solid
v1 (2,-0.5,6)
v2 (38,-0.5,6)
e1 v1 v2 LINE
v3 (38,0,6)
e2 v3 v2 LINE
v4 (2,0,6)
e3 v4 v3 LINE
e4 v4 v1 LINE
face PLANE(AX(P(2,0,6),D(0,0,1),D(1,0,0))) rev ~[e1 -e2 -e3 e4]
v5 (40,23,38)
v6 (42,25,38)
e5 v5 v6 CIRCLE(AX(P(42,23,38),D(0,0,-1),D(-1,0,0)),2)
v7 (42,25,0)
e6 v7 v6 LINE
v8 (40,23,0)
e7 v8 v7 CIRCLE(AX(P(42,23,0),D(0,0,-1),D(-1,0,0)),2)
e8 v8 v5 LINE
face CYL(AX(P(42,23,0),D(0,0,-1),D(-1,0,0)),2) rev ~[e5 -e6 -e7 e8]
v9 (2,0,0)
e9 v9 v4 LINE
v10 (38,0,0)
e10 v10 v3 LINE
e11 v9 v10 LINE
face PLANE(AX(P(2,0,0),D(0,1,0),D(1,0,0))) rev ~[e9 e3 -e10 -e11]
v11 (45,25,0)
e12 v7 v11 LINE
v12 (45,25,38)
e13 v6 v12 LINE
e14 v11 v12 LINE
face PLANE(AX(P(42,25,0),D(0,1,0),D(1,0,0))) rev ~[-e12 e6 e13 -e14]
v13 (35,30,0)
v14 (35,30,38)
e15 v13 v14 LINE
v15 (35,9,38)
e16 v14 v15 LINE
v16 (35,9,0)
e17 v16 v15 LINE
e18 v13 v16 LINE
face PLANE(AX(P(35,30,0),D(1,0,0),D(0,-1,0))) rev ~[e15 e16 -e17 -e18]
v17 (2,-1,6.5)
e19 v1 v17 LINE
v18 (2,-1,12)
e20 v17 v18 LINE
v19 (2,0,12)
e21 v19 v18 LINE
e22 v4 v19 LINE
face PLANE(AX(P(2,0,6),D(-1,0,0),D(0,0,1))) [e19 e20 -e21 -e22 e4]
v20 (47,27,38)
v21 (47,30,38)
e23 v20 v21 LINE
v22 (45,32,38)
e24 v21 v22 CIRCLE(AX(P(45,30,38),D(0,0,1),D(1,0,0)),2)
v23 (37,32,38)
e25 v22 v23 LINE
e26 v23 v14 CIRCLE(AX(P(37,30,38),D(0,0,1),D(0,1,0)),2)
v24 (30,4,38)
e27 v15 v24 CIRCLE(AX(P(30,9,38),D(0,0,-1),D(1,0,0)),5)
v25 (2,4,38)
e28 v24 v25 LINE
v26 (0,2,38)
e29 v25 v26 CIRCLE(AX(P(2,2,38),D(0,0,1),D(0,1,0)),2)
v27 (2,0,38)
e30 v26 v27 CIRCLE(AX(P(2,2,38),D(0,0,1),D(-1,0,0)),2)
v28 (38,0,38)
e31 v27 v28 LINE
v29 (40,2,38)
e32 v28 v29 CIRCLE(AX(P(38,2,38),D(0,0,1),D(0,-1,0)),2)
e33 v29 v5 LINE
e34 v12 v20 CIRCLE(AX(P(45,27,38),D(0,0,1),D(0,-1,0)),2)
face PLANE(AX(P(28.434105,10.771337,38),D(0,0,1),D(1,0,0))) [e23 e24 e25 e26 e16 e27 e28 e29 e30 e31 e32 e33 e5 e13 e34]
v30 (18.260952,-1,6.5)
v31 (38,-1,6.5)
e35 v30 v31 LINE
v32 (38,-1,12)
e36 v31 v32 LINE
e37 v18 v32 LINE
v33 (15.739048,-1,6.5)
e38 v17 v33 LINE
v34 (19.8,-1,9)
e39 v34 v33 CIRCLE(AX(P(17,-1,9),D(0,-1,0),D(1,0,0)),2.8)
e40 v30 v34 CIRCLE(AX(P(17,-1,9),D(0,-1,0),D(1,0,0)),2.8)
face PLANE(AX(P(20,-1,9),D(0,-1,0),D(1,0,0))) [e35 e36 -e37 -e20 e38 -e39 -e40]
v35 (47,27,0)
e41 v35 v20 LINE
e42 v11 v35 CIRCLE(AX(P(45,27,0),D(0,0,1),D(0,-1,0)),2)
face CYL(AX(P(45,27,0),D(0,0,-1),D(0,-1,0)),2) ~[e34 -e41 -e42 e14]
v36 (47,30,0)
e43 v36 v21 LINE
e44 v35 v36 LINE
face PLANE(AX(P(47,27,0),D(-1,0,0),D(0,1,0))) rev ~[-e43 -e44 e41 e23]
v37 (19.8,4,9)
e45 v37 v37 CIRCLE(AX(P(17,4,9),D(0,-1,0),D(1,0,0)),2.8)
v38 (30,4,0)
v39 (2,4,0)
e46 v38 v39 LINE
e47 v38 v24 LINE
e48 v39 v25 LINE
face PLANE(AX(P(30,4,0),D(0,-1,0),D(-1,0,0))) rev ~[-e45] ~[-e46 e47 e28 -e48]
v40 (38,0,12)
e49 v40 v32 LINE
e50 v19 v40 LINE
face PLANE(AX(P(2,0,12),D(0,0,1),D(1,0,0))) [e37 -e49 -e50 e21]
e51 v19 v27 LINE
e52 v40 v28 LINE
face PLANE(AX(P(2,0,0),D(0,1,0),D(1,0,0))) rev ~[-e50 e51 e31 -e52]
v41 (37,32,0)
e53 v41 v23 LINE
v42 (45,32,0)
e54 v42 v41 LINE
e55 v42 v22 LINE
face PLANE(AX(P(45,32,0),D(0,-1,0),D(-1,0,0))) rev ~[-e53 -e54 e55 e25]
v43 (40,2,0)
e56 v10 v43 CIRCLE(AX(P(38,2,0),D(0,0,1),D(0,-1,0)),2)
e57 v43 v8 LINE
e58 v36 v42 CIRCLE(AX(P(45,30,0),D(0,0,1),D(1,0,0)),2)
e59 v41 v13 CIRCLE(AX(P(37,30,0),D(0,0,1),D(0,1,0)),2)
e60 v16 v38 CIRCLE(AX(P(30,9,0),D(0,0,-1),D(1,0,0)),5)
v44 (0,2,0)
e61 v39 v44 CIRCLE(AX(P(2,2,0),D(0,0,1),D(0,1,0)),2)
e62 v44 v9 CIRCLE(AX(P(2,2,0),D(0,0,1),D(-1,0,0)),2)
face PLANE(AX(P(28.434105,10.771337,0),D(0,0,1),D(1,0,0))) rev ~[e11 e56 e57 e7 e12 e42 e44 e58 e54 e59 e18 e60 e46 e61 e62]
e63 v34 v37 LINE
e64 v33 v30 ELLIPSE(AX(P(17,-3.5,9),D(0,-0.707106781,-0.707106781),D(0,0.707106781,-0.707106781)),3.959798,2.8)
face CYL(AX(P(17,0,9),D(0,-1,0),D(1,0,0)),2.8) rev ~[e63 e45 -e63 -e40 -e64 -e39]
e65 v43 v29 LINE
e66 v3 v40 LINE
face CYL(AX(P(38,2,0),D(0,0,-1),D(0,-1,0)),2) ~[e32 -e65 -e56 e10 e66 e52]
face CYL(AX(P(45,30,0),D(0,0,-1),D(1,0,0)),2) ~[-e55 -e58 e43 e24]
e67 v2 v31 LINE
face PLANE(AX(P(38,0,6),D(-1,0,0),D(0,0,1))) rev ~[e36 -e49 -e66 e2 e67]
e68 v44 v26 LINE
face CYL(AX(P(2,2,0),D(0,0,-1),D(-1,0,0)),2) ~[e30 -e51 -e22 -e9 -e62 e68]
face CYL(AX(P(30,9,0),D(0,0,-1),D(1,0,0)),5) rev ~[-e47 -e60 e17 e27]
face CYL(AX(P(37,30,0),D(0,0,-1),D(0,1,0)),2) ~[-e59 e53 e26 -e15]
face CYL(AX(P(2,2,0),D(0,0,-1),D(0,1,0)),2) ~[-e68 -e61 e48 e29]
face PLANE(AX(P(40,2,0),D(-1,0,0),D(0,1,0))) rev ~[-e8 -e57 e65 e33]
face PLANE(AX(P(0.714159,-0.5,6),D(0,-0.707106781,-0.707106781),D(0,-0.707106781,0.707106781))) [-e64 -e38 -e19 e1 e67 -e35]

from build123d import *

# Parameters (mm, degrees)
F1_DEPTH    = 38
F2_W        = 36
F2_H        = 6
F2_R        = 2.8
F3_DEPTH    = 1
F4_DEPTH    = 4
F5_T1_DEPTH = 38.571682988


# Not quite as in the source:
# - a fillet or chamfer that OpenCascade refuses, or shapes differently, is made with other operations: its cross-section is extruded or revolved along the edge and cut away or added


with BuildPart() as f1:
    # F0 (on Top) → F1 (new body)
    with BuildSketch(Plane.XY):
        with BuildLine():
            ThreePointArc((0, 2), (0.5857864376, 0.5857864376), (2, 0))
            Line((2, 0), (38, 0))
            ThreePointArc((38, 0), (39.4142135624, 0.5857864376), (40, 2))
            Line((40, 2), (40, 23))
            ThreePointArc((40, 23), (40.5857864376, 24.4142135624), (42, 25))
            Line((42, 25), (45, 25))
            ThreePointArc((45, 25), (46.4142135624, 25.5857864376), (47, 27))
            Line((47, 27), (47, 30))
            ThreePointArc((47, 30), (46.4142135624, 31.4142135624), (45, 32))
            Line((45, 32), (40, 32))
            Line((40, 32), (37, 32))
            ThreePointArc((37, 32), (35.5857864376, 31.4142135624), (35, 30))
            Line((35, 30), (35, 9))
            ThreePointArc((35, 9), (33.5355339059, 5.4644660941), (30, 4))
            Line((30, 4), (2, 4))
            ThreePointArc((2, 4), (0.5857864376, 3.4142135624), (0, 2))
        make_face()
    extrude(amount=F1_DEPTH)

    # F2 (on face) → F3 (join)
    with BuildSketch(Plane.XZ):
        with Locations((20, 9)):
            Rectangle(F2_W, F2_H)
        with Locations((17, 9)):
            Circle(F2_R, mode=Mode.SUBTRACT)
    extrude(amount=F3_DEPTH)

    # F4 (cut): a face of the model
    f4_faces = [f1.faces().sort_by_distance(p)[0] for p in [
        (17, 0, 9),
    ]]
    extrude(f4_faces, amount=-F4_DEPTH, mode=Mode.SUBTRACT)

    # F5: chamfer of 0.5 on 1 edges, made by hand

    # F5_s2 → F5_t1 (cut)
    with BuildSketch(Plane.YZ.offset(0.714158506)):
        Polygon((-0.5, 6), (-1, 6.5), (-1, 6), align=None)
    extrude(amount=F5_T1_DEPTH, mode=Mode.SUBTRACT)


solid = f1.part
